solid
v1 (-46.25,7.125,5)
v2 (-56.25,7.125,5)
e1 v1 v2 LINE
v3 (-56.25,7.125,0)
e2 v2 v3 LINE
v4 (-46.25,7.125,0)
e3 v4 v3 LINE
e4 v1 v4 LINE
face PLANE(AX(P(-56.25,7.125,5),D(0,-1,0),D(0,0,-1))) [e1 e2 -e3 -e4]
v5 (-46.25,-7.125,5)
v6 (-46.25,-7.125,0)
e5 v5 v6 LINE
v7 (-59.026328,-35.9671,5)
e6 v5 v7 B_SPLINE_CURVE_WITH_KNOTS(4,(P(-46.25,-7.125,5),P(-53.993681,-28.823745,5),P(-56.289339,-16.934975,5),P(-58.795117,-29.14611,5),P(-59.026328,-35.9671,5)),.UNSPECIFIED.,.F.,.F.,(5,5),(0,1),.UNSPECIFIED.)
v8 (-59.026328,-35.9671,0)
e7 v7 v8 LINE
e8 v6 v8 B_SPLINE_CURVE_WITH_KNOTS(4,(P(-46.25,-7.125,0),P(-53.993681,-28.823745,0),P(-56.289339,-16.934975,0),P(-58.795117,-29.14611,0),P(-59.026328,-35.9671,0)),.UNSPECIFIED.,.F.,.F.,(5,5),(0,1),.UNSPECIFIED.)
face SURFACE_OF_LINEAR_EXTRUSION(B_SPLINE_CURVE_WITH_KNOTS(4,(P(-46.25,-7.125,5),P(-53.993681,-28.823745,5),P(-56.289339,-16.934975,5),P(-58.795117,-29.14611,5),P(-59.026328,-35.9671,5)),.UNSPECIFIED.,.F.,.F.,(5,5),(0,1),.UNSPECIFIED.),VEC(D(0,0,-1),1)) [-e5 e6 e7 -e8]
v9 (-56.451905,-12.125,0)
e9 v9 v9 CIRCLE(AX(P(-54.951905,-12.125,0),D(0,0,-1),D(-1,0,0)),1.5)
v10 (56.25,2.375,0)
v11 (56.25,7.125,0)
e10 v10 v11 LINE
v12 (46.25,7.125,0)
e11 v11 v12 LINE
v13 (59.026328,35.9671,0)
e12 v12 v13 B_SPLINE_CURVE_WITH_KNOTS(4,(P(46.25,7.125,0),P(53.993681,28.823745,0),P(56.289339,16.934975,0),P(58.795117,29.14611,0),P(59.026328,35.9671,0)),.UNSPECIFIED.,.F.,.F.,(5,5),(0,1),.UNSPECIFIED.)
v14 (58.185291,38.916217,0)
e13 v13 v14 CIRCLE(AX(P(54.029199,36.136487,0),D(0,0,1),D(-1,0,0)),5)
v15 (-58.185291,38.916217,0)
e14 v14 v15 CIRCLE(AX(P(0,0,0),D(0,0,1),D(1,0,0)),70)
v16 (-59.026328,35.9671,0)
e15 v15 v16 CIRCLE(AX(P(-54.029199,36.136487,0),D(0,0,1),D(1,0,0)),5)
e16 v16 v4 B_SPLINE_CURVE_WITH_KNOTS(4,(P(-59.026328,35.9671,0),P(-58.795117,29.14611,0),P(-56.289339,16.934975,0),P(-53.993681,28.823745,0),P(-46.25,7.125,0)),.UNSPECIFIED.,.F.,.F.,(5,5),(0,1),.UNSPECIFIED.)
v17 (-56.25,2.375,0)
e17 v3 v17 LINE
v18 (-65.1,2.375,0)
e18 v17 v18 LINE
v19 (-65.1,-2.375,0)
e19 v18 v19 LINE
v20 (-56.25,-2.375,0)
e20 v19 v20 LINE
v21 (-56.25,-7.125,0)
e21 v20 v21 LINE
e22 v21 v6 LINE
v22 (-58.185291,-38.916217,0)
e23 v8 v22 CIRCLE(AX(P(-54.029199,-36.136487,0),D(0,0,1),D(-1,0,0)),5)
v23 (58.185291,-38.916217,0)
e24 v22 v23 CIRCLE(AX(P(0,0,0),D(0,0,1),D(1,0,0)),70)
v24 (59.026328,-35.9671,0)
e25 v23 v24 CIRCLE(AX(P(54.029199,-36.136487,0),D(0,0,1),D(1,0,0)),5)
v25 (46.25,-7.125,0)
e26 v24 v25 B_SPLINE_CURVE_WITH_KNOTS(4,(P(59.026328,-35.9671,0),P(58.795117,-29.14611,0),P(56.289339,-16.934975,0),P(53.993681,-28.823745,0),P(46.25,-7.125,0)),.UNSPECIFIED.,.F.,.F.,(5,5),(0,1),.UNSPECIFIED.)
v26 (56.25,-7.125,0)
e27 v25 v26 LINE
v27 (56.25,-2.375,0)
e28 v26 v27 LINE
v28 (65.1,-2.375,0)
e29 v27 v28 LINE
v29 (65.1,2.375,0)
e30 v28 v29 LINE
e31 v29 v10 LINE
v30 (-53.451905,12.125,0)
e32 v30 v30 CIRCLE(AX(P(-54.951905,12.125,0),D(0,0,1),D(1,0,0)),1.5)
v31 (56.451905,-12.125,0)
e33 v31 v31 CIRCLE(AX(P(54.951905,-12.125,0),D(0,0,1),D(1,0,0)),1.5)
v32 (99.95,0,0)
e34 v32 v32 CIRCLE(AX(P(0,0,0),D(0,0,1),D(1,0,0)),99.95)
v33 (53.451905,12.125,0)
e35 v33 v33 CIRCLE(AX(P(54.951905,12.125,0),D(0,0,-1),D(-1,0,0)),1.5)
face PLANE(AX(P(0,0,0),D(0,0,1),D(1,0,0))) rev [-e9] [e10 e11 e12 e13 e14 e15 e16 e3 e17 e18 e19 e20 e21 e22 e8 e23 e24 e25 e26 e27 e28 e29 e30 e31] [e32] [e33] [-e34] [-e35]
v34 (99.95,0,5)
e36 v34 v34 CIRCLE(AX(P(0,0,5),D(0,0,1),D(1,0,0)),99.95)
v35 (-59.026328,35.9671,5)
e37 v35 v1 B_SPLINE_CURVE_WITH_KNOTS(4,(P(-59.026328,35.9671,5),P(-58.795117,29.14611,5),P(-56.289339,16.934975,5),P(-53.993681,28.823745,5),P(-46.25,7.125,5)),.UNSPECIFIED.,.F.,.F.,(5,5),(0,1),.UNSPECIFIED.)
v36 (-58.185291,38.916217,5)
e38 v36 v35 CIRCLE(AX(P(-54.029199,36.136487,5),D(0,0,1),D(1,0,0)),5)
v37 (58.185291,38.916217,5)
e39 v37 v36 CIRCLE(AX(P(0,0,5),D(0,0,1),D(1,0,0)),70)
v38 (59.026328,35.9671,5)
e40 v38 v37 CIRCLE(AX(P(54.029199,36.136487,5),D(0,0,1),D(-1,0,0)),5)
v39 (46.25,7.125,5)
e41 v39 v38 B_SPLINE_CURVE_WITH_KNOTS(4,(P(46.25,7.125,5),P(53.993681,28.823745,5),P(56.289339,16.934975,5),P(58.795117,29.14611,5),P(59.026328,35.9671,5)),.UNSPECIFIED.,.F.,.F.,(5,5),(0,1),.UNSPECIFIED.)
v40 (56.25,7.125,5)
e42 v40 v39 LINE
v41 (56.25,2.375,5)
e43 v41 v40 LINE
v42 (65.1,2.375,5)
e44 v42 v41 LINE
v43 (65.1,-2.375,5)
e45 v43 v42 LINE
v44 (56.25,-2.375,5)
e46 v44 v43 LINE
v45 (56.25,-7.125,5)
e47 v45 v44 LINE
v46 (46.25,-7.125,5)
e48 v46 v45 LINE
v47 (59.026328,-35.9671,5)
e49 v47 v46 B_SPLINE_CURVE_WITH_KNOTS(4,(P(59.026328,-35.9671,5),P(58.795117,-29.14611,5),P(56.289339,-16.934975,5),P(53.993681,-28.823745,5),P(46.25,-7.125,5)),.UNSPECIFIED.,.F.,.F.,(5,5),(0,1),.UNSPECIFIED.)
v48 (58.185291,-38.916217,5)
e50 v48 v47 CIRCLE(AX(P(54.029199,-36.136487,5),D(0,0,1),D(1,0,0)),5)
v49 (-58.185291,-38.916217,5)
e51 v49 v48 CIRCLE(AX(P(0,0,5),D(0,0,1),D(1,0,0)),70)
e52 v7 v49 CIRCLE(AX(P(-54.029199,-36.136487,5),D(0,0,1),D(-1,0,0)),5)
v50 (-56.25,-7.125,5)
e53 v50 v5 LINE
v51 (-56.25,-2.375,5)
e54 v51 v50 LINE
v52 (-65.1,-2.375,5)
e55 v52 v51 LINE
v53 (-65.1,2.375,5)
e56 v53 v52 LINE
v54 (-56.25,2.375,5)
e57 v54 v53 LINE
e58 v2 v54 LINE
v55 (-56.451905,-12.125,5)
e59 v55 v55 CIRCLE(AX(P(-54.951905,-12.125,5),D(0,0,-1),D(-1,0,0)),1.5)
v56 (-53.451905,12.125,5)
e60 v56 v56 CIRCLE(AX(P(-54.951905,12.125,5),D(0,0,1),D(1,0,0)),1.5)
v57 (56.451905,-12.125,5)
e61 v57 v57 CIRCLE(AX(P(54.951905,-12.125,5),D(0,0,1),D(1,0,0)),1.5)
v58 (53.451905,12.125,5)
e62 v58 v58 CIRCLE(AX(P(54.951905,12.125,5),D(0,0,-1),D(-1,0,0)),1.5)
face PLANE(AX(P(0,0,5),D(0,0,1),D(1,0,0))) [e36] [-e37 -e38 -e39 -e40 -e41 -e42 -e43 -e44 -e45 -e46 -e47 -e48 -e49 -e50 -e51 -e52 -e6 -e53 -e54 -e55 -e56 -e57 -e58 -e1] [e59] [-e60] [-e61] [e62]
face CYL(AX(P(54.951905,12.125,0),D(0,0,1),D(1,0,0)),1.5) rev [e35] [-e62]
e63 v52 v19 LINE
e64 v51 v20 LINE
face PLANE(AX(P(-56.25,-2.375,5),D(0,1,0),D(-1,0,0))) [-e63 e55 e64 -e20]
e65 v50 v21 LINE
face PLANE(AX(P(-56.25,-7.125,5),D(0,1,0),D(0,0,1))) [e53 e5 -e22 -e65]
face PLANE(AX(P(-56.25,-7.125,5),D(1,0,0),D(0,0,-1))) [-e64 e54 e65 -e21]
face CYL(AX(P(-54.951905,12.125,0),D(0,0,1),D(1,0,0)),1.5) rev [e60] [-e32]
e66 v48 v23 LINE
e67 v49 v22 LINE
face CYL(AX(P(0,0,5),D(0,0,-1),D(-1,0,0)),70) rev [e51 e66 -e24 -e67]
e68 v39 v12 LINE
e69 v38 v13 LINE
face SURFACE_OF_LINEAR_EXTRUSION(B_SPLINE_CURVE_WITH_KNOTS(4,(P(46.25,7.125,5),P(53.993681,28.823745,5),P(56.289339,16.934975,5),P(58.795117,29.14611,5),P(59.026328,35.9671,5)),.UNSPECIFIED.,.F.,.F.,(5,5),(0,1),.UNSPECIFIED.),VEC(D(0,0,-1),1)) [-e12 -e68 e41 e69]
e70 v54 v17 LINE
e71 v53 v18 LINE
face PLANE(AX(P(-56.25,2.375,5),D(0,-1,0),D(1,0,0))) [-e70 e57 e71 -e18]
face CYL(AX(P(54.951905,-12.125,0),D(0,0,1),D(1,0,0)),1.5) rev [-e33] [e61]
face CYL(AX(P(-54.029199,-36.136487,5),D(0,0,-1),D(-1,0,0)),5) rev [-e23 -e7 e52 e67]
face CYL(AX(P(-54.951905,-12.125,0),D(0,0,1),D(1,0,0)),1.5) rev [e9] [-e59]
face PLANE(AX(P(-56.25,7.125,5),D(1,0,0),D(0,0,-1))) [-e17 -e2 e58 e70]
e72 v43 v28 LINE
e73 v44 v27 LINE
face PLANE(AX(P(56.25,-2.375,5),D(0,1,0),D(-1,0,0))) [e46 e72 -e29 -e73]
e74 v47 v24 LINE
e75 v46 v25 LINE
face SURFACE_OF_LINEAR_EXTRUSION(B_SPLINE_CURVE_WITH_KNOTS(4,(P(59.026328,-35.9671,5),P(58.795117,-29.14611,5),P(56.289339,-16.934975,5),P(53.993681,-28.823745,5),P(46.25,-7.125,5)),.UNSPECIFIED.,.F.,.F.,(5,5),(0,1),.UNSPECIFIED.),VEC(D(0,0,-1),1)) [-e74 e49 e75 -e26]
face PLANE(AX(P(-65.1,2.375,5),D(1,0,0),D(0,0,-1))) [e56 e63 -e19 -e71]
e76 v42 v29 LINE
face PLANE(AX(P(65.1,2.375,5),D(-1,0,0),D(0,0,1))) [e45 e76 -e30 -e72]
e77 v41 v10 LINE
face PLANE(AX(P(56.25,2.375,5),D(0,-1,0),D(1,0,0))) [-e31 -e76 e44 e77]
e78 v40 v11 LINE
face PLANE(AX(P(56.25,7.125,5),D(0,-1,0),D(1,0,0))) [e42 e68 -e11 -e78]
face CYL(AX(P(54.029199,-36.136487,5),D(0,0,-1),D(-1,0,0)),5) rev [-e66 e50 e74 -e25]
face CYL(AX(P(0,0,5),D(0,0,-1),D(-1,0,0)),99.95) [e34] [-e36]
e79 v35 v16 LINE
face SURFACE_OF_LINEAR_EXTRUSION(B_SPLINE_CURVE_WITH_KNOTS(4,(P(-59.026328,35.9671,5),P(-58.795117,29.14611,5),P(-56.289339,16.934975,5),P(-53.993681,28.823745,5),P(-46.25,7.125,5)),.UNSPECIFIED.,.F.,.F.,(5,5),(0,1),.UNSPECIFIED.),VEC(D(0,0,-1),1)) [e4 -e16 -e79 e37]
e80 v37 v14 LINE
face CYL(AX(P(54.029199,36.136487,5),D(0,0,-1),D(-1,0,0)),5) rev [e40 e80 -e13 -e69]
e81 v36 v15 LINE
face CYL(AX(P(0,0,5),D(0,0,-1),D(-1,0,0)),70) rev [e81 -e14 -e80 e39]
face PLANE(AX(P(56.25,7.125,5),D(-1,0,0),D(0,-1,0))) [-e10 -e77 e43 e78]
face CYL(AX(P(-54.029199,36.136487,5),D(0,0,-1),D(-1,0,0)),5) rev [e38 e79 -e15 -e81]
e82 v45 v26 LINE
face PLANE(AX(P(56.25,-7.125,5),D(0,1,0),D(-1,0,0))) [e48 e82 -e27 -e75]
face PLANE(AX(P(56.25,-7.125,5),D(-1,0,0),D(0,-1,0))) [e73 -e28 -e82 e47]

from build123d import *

# Parameters (mm, degrees)
BOSS_EXTRUDE1_OUTLINE_R = 99.95
BOSS_EXTRUDE1_DEPTH     = 5
SKETCH12_R              = 1.5
CUT_EXTRUDE1_DEPTH      = 142.439050622


# Read off the part's stored shape, not the designer's step: Boss-Extrude1
with BuildPart() as part:
    # Boss-Extrude1 outline → Boss-Extrude1 (new body)
    with BuildSketch(Plane.XY):
        Circle(BOSS_EXTRUDE1_OUTLINE_R)
        with BuildLine():
            Line((-65.1, 2.375), (-56.25, 2.375))
            Line((-56.25, 2.375), (-56.25, 7.125))
            Line((-56.25, 7.125), (-46.25, 7.125))
            add(Edge.make_bspline(
                [(-59.02632848, 35.967099571), (-58.7951175, 29.14610967), (-56.28933902, 16.934975154), (-53.993681028, 28.823744698), (-46.25, 7.125)],
                knots=[0, 0, 0, 0, 0, 1, 1, 1, 1, 1], degree=4))
            ThreePointArc((-59.02632848, 35.967099571), (-58.837492639, 37.507730313), (-58.185290714, 38.916216986))
            ThreePointArc((-58.185290714, 38.916216986), (0, 70), (58.185290714, 38.916216986))
            ThreePointArc((58.185290714, 38.916216986), (58.837492639, 37.507730313), (59.02632848, 35.967099571))
            add(Edge.make_bspline(
                [(46.25, 7.125), (53.993681028, 28.823744698), (56.28933902, 16.934975154), (58.7951175, 29.14610967), (59.02632848, 35.967099571)],
                knots=[0, 0, 0, 0, 0, 1, 1, 1, 1, 1], degree=4))
            Line((46.25, 7.125), (56.25, 7.125))
            Line((56.25, 7.125), (56.25, 2.375))
            Line((56.25, 2.375), (65.1, 2.375))
            Line((65.1, 2.375), (65.1, -2.375))
            Line((65.1, -2.375), (56.25, -2.375))
            Line((56.25, -2.375), (56.25, -7.125))
            Line((56.25, -7.125), (46.25, -7.125))
            add(Edge.make_bspline(
                [(59.02632848, -35.967099571), (58.7951175, -29.14610967), (56.28933902, -16.934975154), (53.993681028, -28.823744698), (46.25, -7.125)],
                knots=[0, 0, 0, 0, 0, 1, 1, 1, 1, 1], degree=4))
            ThreePointArc((59.02632848, -35.967099571), (58.837492639, -37.507730313), (58.185290714, -38.916216986))
            ThreePointArc((58.185290714, -38.916216986), (0, -70), (-58.185290714, -38.916216986))
            ThreePointArc((-58.185290714, -38.916216986), (-58.837492639, -37.507730313), (-59.02632848, -35.967099571))
            add(Edge.make_bspline(
                [(-46.25, -7.125), (-53.993681028, -28.823744698), (-56.28933902, -16.934975154), (-58.7951175, -29.14610967), (-59.02632848, -35.967099571)],
                knots=[0, 0, 0, 0, 0, 1, 1, 1, 1, 1], degree=4))
            Line((-46.25, -7.125), (-56.25, -7.125))
            Line((-56.25, -7.125), (-56.25, -2.375))
            Line((-56.25, -2.375), (-65.1, -2.375))
            Line((-65.1, -2.375), (-65.1, 2.375))
        make_face(mode=Mode.SUBTRACT)
    extrude(amount=BOSS_EXTRUDE1_DEPTH)

    # Sketch12 → Cut-Extrude1 (cut, through all)
    with BuildSketch(Plane.XY.offset(5)):
        with Locations((-54.951905284, 12.125)):
            Circle(SKETCH12_R)
        with Locations(Location((54.951905284, 12.125, 0), (0, 0, 180))):
            Circle(SKETCH12_R)
        with Locations((54.951905284, -12.125)):
            Circle(SKETCH12_R)
        with Locations(Location((-54.951905284, -12.125, 0), (0, 0, 180))):
            Circle(SKETCH12_R)
    extrude(amount=-CUT_EXTRUDE1_DEPTH, mode=Mode.SUBTRACT)


solid = part.part
